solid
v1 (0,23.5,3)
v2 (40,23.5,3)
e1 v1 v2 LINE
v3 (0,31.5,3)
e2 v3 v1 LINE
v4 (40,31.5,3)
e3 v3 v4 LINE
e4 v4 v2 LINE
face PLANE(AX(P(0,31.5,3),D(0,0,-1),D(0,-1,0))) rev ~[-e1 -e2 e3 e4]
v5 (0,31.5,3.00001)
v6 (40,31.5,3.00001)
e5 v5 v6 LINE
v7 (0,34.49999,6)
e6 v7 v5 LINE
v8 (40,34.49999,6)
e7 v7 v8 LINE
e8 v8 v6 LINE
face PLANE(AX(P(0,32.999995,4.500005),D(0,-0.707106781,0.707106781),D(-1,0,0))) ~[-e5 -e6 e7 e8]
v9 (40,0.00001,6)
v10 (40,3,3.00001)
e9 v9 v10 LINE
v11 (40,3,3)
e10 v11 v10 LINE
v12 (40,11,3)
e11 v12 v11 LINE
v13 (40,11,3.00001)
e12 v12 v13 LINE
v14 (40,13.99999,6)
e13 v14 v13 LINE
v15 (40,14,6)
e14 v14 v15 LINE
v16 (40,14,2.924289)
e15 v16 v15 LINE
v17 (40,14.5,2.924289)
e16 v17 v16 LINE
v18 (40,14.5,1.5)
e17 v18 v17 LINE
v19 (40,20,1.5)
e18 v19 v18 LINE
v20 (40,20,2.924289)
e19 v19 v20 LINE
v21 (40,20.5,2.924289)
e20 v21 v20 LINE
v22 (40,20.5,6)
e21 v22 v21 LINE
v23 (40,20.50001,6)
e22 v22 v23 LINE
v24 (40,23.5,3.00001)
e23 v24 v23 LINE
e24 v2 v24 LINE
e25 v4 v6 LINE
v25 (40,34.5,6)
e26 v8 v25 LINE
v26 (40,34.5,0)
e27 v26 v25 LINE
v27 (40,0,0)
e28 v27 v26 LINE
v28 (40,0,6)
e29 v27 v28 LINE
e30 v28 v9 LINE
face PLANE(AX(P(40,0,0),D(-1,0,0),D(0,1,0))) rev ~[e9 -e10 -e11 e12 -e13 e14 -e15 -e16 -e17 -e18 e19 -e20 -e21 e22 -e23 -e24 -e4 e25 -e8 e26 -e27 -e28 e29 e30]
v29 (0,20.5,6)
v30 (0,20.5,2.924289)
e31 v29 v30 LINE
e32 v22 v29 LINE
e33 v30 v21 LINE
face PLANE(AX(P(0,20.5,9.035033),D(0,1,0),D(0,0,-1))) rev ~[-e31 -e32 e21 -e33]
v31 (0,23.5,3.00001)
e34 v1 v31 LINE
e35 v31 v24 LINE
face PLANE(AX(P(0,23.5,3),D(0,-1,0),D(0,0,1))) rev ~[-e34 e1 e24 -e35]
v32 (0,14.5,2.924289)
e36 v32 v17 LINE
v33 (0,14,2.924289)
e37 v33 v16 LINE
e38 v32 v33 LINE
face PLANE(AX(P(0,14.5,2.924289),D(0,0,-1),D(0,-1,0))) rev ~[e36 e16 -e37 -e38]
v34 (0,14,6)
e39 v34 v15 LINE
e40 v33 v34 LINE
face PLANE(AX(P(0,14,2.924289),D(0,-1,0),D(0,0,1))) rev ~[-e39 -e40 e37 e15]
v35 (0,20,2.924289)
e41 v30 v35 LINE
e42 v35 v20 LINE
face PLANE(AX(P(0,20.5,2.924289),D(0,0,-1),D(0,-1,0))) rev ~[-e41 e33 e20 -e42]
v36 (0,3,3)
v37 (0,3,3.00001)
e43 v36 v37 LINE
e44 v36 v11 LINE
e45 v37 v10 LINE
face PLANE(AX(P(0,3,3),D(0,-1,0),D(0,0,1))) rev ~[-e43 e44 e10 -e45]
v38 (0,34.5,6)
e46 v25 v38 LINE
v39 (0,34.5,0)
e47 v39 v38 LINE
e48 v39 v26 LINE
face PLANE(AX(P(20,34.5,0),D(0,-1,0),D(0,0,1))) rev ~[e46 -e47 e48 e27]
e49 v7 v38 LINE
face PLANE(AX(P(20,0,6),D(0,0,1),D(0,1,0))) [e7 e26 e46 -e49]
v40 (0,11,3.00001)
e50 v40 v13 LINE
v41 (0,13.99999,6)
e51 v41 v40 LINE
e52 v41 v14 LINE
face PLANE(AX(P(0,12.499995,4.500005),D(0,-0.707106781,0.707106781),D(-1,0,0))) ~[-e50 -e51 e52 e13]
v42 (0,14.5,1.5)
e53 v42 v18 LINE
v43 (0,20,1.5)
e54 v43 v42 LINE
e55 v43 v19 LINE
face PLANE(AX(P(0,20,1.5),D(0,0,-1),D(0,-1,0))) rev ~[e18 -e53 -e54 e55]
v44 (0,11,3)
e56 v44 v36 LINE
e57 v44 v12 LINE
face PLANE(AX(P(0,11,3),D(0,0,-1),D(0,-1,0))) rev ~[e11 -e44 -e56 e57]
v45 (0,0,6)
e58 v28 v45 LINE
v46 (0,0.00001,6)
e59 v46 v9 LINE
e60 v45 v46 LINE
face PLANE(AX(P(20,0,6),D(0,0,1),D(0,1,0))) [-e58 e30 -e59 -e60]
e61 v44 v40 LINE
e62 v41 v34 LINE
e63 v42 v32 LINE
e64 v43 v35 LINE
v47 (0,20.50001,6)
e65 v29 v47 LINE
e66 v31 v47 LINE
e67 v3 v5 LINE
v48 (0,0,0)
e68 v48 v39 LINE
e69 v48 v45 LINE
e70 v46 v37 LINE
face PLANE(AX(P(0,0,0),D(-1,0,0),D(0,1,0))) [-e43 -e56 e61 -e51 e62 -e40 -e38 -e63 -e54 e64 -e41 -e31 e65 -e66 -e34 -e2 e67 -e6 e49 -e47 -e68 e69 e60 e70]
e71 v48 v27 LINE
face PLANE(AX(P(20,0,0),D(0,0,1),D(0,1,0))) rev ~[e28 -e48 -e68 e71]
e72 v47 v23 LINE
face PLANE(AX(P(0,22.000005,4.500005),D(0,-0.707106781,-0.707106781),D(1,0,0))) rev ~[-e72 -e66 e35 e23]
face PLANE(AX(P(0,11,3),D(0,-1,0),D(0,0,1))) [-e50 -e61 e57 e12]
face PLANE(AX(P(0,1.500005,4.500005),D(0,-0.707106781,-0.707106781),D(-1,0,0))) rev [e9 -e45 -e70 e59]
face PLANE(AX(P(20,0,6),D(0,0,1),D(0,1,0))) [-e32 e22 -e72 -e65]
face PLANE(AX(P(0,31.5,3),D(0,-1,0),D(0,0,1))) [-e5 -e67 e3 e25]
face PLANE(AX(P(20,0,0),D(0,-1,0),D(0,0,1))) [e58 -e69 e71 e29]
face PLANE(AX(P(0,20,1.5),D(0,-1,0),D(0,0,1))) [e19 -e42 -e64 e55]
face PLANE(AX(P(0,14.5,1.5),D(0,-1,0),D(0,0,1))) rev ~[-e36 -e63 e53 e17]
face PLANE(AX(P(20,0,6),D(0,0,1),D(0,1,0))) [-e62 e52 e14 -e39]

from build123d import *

# Parameters (mm, degrees)
F0_W     = 20
F0_H     = 34.5
F1_DEPTH = 6
F2_DEPTH = 20
F3_W     = 5.5
F3_H     = 3.0757111441
F3_W_2   = 0.5
F3_H_2   = 1.4242888559
F4_DEPTH = 50
F5_W     = 8
F5_H     = 3
F6_DEPTH = 50
F7_SIZE  = 2.99999


# Not quite as in the source:
# - a fillet or chamfer is up to 0.001 mm smaller than in the source, because OpenCascade refuses the exact size


with BuildPart() as f1:
    # F0 (on Top) → F1 (new body)
    with BuildSketch(Plane.XY):
        with Locations((10, 17.25)):
            Rectangle(F0_W, F0_H)
    extrude(amount=F1_DEPTH)

    # F2 (add): a face of the model
    f2_faces = [f1.faces().sort_by_distance(p)[0] for p in [
        (20, 17.25, 3),
    ]]
    extrude(f2_faces, amount=F2_DEPTH)

    # F3 (on face) → F4 (cut)
    with BuildSketch(Plane(origin=(0, 0, 0), x_dir=(0, -1, 0), z_dir=(-1, 0, 0))):
        Polygon((-20, 6.5), (-14.5, 6.5), (-14.5, 6), (-14, 6), (-14, 9.0350331739), (-20.5, 9.0350331739), (-20.5, 6), (-20, 6), align=None)
        with Locations((-17.25, 4.4621444279)):
            Rectangle(F3_W, F3_H)
        with Locations((-14.25, 4.4621444279)):
            Rectangle(F3_W_2, F3_H)
        with Locations((-20.25, 4.4621444279)):
            Rectangle(F3_W_2, F3_H)
        with Locations((-17.25, 2.2121444279)):
            Rectangle(F3_W, F3_H_2)
    extrude(amount=-F4_DEPTH, mode=Mode.SUBTRACT)

    # F5 (on face) → F6 (cut)
    with BuildSketch(Plane(origin=(0, 0, 0), x_dir=(0, -1, 0), z_dir=(-1, 0, 0))):
        with Locations((-27.5, 4.5)):
            Rectangle(F5_W, F5_H)
        with Locations((-7, 4.5)):
            Rectangle(F5_W, F5_H)
    extrude(amount=-F6_DEPTH, mode=Mode.SUBTRACT)

    # F7 (size 3 in the source; OpenCascade refuses exactly that, so slightly less here)
    f7_edges = [f1.edges().sort_by_distance(p)[0] for p in [
        (20, 11, 6),
        (20, 3, 6),
        (20, 31.5, 6),
        (20, 23.5, 6),
    ]]
    chamfer(f7_edges, length=F7_SIZE)


solid = f1.part
